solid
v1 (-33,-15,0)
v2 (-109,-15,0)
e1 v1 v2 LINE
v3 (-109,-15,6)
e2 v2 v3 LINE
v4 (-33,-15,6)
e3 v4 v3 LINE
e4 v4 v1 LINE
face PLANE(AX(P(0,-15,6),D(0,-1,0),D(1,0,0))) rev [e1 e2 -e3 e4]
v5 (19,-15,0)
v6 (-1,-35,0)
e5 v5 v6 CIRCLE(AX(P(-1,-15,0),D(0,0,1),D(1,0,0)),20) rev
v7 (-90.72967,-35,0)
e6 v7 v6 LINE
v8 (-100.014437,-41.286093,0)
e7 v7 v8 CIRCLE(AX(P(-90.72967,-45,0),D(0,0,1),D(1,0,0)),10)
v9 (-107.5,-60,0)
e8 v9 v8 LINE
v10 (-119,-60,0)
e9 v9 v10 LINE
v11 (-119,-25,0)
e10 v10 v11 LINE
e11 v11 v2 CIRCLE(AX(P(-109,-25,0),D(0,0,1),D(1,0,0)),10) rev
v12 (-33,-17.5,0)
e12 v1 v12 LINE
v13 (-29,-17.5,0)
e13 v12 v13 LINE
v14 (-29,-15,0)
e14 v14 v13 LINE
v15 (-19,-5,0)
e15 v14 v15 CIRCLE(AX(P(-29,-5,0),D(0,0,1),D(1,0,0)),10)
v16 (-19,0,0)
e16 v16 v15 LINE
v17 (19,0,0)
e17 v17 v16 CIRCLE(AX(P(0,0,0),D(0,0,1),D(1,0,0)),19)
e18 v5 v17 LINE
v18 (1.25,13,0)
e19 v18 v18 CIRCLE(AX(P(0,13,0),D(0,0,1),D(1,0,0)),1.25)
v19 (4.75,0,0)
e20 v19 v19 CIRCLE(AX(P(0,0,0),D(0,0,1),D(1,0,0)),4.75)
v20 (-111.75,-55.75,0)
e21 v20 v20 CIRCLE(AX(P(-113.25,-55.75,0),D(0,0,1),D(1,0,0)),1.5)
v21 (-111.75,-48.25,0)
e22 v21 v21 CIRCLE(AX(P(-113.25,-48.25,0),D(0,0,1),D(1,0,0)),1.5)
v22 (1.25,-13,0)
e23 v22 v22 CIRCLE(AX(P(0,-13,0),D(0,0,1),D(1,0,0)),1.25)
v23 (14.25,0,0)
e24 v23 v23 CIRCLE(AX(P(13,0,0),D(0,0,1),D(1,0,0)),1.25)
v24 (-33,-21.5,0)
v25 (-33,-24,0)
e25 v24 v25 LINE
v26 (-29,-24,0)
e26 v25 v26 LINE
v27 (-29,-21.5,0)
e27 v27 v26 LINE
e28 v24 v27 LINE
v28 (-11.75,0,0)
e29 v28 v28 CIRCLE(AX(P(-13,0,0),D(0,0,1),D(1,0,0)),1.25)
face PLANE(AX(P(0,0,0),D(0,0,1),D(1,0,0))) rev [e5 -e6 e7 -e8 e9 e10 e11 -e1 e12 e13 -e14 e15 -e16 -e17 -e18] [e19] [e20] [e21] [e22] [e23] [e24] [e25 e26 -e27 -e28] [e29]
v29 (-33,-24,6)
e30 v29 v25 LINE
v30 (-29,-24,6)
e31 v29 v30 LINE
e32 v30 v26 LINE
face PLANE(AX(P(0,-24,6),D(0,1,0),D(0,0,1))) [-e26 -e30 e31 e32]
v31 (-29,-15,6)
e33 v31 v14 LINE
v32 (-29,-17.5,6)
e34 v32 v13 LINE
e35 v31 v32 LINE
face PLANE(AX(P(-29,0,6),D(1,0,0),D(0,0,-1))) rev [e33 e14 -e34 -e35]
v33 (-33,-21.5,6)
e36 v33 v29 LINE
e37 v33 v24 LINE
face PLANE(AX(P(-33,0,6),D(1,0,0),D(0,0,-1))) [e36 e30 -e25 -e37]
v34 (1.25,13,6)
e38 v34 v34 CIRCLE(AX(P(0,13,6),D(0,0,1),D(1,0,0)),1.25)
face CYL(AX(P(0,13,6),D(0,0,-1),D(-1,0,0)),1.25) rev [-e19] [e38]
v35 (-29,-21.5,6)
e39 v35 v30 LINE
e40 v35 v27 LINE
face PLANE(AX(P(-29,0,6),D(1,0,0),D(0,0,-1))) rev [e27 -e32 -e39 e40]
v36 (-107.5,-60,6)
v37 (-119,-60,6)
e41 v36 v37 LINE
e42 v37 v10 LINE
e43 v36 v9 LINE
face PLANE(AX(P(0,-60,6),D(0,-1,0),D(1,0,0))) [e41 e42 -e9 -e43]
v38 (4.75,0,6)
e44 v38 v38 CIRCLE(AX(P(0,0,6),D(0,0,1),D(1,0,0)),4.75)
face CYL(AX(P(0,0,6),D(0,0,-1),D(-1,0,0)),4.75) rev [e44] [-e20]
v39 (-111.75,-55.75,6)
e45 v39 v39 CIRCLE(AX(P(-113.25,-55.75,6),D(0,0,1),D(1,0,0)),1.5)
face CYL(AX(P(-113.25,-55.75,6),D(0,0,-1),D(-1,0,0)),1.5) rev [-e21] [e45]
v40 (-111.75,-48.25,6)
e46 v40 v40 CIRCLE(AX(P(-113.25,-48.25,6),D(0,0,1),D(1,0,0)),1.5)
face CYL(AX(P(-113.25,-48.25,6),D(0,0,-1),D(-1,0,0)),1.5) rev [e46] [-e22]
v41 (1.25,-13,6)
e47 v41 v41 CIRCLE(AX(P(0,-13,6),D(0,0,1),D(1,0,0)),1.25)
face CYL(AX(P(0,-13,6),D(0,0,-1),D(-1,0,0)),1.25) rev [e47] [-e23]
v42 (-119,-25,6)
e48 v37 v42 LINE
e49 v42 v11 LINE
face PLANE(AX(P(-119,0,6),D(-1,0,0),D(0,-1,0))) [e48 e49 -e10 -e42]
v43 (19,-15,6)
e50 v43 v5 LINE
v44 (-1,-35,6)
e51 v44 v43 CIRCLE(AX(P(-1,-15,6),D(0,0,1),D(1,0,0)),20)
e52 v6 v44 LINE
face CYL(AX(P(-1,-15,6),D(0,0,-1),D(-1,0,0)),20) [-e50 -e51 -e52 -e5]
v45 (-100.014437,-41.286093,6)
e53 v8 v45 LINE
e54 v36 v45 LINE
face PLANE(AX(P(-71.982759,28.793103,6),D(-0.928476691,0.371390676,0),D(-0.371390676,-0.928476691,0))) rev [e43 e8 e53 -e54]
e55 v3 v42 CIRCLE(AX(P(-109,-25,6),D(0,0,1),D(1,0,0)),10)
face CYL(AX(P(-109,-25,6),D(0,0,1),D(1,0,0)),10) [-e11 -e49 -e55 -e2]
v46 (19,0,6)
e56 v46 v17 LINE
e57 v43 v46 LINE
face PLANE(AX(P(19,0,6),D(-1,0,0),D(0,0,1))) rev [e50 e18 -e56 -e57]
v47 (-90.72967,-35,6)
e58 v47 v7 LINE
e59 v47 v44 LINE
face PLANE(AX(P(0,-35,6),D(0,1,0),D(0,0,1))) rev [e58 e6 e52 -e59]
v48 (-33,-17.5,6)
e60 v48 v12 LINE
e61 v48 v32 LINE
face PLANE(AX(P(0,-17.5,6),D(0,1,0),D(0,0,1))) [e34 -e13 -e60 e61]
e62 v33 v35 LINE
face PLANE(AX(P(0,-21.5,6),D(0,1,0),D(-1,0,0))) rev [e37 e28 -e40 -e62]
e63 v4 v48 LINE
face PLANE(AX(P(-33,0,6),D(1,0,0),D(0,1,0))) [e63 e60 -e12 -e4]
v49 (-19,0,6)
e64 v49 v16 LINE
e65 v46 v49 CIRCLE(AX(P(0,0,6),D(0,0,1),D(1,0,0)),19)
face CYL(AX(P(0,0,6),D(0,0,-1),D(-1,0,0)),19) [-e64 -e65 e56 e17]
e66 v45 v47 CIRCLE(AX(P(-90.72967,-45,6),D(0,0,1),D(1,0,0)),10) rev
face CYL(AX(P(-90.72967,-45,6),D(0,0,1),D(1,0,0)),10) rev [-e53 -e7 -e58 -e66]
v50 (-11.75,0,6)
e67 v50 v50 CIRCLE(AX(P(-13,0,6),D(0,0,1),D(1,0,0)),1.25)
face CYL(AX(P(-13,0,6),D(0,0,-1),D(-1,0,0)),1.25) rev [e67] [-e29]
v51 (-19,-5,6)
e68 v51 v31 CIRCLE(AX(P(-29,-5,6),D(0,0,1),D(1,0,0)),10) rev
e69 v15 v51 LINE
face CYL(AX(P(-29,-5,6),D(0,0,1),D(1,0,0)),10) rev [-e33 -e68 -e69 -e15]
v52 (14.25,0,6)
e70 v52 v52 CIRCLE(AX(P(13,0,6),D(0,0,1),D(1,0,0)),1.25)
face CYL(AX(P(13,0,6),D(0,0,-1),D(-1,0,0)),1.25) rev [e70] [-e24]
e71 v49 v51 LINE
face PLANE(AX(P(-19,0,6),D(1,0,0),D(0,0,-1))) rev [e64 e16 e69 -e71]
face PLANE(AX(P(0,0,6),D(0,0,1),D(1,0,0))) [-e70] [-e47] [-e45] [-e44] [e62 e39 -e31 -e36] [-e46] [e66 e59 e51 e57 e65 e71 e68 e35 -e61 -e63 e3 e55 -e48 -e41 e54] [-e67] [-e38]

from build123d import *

# Parameters (mm, degrees)
SKETCH_1_W      = 4
SKETCH_1_H      = 2.5
SKETCH_1_R      = 1.25
SKETCH_1_R_2    = 4.75
SKETCH_1_R_3    = 1.5
EXTRUDE_1_DEPTH = 6
FILLET_1_R      = 10
FILLET_2_R      = 20
FILLET_3_R      = 10


with BuildPart() as part:
    # Эскиз1 → Бобышка-Вытянуть1 (new body)
    with BuildSketch(Plane.XY):
        with BuildLine():
            Line((19, -35), (19, 0))
            ThreePointArc((19, 0), (0, 19), (-19, 0))
            Line((-19, 0), (-19, -15))
            Line((-19, -15), (-29, -15))
            Line((-29, -15), (-29, -17.5))
            Line((-29, -17.5), (-33, -17.5))
            Line((-33, -17.5), (-33, -15))
            Line((-33, -15), (-119, -15))
            Line((-119, -15), (-119, -60))
            Line((-119, -60), (-107.5, -60))
            Line((-107.5, -60), (-97.5, -35))
            Line((-97.5, -35), (19, -35))
        make_face()
        with Locations((-31, -22.75)):
            Rectangle(SKETCH_1_W, SKETCH_1_H, mode=Mode.SUBTRACT)
        with Locations((0, -13)):
            Circle(SKETCH_1_R, mode=Mode.SUBTRACT)
        with Locations((-13, 0)):
            Circle(SKETCH_1_R, mode=Mode.SUBTRACT)
        Circle(SKETCH_1_R_2, mode=Mode.SUBTRACT)
        with Locations((13, 0)):
            Circle(SKETCH_1_R, mode=Mode.SUBTRACT)
        with Locations((0, 13)):
            Circle(SKETCH_1_R, mode=Mode.SUBTRACT)
        with Locations((-113.25, -55.75)):
            Circle(SKETCH_1_R_3, mode=Mode.SUBTRACT)
        with Locations((-113.25, -48.25)):
            Circle(SKETCH_1_R_3, mode=Mode.SUBTRACT)
    extrude(amount=EXTRUDE_1_DEPTH)

    # Скругление1
    fillet_1_edges = [part.edges().sort_by_distance(p)[0] for p in [
        (-19, -15, 3),
    ]]
    fillet(fillet_1_edges, radius=FILLET_1_R - 0.0001)  # a hair under: the kernel refuses the full size

    # Скругление2
    fillet_2_edges = [part.edges().sort_by_distance(p)[0] for p in [
        (19, -35, 3),
    ]]
    fillet(fillet_2_edges, radius=FILLET_2_R)

    # Скругление3
    fillet_3_edges = [part.edges().sort_by_distance(p)[0] for p in [
        (-119, -15, 3),
        (-97.5, -35, 3),
    ]]
    fillet(fillet_3_edges, radius=FILLET_3_R)


solid = part.part
